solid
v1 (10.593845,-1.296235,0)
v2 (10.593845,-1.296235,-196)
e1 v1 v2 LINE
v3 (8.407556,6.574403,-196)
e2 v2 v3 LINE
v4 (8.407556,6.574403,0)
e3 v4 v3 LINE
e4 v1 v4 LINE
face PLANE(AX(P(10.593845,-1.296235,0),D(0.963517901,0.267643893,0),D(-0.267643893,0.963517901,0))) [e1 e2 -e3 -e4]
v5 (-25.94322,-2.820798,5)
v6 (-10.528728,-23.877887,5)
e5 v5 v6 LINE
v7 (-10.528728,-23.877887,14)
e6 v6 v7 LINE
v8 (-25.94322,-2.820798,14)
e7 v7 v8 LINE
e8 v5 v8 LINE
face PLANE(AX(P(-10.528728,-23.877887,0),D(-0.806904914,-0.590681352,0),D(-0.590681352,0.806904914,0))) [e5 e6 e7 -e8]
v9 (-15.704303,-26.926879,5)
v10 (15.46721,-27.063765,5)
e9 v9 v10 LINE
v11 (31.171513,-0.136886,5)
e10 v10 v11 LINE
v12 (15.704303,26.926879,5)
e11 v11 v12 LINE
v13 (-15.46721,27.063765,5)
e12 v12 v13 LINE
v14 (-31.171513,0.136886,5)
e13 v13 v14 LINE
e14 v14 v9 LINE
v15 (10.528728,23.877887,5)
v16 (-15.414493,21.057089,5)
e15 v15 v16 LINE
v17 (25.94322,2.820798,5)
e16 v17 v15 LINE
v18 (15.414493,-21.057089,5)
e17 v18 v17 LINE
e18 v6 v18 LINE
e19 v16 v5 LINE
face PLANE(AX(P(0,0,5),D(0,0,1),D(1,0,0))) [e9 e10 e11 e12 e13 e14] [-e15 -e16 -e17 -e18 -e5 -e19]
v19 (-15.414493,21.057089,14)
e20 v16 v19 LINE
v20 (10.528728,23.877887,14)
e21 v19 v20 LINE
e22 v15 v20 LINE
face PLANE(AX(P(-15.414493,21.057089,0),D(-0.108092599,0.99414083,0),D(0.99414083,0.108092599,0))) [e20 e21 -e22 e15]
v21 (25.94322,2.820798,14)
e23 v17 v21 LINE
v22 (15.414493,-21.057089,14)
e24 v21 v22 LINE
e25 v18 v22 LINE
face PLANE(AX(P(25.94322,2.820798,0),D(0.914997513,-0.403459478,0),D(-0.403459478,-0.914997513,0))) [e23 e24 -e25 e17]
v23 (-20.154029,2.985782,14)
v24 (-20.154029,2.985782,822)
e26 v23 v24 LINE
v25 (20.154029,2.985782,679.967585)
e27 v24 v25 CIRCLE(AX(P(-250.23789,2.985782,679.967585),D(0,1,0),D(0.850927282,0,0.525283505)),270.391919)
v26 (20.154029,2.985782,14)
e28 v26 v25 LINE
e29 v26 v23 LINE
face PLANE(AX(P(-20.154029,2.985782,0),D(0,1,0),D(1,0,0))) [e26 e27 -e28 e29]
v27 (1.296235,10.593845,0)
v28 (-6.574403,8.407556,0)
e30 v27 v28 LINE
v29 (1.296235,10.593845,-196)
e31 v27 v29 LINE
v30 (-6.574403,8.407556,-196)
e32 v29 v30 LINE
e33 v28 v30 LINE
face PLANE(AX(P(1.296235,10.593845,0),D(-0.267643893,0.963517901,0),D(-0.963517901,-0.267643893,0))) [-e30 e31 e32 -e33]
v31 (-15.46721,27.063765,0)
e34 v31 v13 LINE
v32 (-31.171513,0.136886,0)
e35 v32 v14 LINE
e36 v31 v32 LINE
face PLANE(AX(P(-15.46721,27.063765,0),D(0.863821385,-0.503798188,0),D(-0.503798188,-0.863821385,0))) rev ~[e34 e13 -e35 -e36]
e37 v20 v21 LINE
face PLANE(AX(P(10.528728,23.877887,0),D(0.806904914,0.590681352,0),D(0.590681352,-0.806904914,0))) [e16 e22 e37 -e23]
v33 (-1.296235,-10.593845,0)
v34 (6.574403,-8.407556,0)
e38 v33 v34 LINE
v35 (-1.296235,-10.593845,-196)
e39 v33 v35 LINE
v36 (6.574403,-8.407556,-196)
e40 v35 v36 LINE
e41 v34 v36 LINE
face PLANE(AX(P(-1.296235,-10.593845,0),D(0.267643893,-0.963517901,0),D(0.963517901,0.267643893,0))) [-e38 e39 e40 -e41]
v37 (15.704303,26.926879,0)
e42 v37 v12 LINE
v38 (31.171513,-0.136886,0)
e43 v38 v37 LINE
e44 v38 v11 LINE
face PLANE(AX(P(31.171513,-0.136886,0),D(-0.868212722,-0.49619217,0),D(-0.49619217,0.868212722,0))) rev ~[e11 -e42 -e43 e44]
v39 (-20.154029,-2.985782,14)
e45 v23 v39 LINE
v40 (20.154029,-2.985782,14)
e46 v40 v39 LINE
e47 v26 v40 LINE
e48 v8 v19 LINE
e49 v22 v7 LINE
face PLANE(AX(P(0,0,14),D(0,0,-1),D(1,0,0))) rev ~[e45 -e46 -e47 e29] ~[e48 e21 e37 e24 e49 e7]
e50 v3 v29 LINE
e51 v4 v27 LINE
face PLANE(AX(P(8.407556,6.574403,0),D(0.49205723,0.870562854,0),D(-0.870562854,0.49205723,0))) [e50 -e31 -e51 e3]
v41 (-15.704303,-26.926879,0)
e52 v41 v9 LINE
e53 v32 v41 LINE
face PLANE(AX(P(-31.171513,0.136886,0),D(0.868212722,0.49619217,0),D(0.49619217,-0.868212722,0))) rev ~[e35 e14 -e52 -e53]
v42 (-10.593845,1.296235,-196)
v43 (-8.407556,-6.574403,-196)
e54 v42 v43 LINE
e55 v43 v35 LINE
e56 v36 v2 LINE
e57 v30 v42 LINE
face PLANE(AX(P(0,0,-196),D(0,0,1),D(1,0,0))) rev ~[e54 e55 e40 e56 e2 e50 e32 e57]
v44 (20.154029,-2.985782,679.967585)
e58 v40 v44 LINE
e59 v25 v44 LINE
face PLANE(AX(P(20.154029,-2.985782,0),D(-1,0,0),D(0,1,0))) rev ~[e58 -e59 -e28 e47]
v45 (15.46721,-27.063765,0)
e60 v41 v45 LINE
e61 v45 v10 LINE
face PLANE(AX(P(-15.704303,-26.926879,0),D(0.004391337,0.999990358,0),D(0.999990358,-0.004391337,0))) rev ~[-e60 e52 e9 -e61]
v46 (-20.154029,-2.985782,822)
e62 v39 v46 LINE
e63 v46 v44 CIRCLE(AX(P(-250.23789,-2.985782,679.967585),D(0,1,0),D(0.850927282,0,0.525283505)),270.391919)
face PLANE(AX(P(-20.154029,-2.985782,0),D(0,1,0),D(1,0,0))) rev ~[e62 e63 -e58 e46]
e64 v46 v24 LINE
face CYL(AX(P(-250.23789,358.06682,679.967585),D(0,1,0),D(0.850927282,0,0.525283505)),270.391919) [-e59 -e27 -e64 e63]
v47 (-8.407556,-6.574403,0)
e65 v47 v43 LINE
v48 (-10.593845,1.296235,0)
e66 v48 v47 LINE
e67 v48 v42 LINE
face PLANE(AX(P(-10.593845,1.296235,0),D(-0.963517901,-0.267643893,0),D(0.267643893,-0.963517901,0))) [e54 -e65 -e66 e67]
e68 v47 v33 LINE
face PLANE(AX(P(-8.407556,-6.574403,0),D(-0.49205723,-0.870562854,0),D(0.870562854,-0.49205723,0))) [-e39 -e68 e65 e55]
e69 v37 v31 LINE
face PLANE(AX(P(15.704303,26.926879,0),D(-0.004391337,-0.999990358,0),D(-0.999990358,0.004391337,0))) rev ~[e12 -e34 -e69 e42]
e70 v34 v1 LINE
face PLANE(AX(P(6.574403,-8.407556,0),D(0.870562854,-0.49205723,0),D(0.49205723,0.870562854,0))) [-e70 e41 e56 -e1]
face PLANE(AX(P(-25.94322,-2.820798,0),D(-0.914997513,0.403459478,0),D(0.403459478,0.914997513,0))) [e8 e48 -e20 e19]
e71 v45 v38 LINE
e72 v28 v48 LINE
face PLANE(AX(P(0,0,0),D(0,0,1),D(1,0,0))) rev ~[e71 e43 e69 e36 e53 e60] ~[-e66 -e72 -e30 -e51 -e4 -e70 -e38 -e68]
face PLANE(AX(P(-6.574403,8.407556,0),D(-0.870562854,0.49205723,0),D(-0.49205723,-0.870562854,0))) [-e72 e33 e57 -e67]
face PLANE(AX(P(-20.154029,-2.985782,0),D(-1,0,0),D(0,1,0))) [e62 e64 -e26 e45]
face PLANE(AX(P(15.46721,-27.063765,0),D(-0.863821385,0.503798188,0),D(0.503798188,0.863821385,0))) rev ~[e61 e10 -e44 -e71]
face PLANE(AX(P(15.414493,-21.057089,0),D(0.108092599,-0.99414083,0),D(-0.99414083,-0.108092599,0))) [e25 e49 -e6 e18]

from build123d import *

# Parameters (mm, degrees)
F0_W        = 40.3080582619
F0_H        = 5.9715644456
F1_DEPTH    = 822
F3_DEPTH    = 196
F5_DEPTH    = 5
F6_T1_DEPTH = 716.1336390313
F8_DEPTH    = 14


# Not quite as in the source:
# - a fillet or chamfer that OpenCascade refuses, or shapes differently, is made with other operations: its cross-section is extruded or revolved along the edge and cut away or added


with BuildPart() as f1:
    # F0 (on Top) → F1 (new body)
    with BuildSketch(Plane.XY):
        Rectangle(F0_W, F0_H)
    extrude(amount=F1_DEPTH)

    # F2 (on Top) → F3 (join)
    with BuildSketch(Plane.XY):
        Polygon((6.5744029718, -8.407556447), (10.5938451005, -1.2962352533), (8.407556447, 6.5744029718), (1.2962352533, 10.5938451005), (-6.5744029718, 8.407556447), (-10.5938451005, 1.2962352533), (-8.407556447, -6.5744029718), (-1.2962352533, -10.5938451005), align=None)
    extrude(amount=-F3_DEPTH)

    # F4 (on Top) → F5 (join)
    with BuildSketch(Plane.XY):
        Polygon((31.1715127681, -0.1368859226), (15.7043030704, 26.9268789703), (-15.4672096977, 27.0637648929), (-31.1715127681, 0.1368859226), (-15.7043030704, -26.9268789703), (15.4672096977, -27.0637648929), align=None)
    extrude(amount=F5_DEPTH)

    # F6: fillet of radius 270.3919189858 on 1 edges, made by hand

    # F6_s2 → F6_t1 (cut)
    with BuildSketch(Plane.XZ.offset(-358.0668195157)):
        with BuildLine():
            ThreePointArc((-20.1540291309, 822), (9.881896476, 753.7882231999), (20.1540291309, 679.9675850829))
            Line((20.1540291309, 679.9675850829), (20.1540291309, 822))
            Line((20.1540291309, 822), (-20.1540291309, 822))
        make_face()
    extrude(amount=F6_T1_DEPTH, mode=Mode.SUBTRACT)

    # F7 (on face) → F8 (join)
    with BuildSketch(Plane(origin=(0, 0, 0), x_dir=(1, 0, 0), z_dir=(0, 0, -1))):
        Polygon((-10.5287277243, 23.8778866657), (-25.9432203033, 2.8207976541), (-15.4144925791, -21.0570890116), (10.5287277243, -23.8778866657), (25.9432203033, -2.8207976541), (15.4144925791, 21.0570890116), align=None)
    extrude(amount=-F8_DEPTH)


solid = f1.part
